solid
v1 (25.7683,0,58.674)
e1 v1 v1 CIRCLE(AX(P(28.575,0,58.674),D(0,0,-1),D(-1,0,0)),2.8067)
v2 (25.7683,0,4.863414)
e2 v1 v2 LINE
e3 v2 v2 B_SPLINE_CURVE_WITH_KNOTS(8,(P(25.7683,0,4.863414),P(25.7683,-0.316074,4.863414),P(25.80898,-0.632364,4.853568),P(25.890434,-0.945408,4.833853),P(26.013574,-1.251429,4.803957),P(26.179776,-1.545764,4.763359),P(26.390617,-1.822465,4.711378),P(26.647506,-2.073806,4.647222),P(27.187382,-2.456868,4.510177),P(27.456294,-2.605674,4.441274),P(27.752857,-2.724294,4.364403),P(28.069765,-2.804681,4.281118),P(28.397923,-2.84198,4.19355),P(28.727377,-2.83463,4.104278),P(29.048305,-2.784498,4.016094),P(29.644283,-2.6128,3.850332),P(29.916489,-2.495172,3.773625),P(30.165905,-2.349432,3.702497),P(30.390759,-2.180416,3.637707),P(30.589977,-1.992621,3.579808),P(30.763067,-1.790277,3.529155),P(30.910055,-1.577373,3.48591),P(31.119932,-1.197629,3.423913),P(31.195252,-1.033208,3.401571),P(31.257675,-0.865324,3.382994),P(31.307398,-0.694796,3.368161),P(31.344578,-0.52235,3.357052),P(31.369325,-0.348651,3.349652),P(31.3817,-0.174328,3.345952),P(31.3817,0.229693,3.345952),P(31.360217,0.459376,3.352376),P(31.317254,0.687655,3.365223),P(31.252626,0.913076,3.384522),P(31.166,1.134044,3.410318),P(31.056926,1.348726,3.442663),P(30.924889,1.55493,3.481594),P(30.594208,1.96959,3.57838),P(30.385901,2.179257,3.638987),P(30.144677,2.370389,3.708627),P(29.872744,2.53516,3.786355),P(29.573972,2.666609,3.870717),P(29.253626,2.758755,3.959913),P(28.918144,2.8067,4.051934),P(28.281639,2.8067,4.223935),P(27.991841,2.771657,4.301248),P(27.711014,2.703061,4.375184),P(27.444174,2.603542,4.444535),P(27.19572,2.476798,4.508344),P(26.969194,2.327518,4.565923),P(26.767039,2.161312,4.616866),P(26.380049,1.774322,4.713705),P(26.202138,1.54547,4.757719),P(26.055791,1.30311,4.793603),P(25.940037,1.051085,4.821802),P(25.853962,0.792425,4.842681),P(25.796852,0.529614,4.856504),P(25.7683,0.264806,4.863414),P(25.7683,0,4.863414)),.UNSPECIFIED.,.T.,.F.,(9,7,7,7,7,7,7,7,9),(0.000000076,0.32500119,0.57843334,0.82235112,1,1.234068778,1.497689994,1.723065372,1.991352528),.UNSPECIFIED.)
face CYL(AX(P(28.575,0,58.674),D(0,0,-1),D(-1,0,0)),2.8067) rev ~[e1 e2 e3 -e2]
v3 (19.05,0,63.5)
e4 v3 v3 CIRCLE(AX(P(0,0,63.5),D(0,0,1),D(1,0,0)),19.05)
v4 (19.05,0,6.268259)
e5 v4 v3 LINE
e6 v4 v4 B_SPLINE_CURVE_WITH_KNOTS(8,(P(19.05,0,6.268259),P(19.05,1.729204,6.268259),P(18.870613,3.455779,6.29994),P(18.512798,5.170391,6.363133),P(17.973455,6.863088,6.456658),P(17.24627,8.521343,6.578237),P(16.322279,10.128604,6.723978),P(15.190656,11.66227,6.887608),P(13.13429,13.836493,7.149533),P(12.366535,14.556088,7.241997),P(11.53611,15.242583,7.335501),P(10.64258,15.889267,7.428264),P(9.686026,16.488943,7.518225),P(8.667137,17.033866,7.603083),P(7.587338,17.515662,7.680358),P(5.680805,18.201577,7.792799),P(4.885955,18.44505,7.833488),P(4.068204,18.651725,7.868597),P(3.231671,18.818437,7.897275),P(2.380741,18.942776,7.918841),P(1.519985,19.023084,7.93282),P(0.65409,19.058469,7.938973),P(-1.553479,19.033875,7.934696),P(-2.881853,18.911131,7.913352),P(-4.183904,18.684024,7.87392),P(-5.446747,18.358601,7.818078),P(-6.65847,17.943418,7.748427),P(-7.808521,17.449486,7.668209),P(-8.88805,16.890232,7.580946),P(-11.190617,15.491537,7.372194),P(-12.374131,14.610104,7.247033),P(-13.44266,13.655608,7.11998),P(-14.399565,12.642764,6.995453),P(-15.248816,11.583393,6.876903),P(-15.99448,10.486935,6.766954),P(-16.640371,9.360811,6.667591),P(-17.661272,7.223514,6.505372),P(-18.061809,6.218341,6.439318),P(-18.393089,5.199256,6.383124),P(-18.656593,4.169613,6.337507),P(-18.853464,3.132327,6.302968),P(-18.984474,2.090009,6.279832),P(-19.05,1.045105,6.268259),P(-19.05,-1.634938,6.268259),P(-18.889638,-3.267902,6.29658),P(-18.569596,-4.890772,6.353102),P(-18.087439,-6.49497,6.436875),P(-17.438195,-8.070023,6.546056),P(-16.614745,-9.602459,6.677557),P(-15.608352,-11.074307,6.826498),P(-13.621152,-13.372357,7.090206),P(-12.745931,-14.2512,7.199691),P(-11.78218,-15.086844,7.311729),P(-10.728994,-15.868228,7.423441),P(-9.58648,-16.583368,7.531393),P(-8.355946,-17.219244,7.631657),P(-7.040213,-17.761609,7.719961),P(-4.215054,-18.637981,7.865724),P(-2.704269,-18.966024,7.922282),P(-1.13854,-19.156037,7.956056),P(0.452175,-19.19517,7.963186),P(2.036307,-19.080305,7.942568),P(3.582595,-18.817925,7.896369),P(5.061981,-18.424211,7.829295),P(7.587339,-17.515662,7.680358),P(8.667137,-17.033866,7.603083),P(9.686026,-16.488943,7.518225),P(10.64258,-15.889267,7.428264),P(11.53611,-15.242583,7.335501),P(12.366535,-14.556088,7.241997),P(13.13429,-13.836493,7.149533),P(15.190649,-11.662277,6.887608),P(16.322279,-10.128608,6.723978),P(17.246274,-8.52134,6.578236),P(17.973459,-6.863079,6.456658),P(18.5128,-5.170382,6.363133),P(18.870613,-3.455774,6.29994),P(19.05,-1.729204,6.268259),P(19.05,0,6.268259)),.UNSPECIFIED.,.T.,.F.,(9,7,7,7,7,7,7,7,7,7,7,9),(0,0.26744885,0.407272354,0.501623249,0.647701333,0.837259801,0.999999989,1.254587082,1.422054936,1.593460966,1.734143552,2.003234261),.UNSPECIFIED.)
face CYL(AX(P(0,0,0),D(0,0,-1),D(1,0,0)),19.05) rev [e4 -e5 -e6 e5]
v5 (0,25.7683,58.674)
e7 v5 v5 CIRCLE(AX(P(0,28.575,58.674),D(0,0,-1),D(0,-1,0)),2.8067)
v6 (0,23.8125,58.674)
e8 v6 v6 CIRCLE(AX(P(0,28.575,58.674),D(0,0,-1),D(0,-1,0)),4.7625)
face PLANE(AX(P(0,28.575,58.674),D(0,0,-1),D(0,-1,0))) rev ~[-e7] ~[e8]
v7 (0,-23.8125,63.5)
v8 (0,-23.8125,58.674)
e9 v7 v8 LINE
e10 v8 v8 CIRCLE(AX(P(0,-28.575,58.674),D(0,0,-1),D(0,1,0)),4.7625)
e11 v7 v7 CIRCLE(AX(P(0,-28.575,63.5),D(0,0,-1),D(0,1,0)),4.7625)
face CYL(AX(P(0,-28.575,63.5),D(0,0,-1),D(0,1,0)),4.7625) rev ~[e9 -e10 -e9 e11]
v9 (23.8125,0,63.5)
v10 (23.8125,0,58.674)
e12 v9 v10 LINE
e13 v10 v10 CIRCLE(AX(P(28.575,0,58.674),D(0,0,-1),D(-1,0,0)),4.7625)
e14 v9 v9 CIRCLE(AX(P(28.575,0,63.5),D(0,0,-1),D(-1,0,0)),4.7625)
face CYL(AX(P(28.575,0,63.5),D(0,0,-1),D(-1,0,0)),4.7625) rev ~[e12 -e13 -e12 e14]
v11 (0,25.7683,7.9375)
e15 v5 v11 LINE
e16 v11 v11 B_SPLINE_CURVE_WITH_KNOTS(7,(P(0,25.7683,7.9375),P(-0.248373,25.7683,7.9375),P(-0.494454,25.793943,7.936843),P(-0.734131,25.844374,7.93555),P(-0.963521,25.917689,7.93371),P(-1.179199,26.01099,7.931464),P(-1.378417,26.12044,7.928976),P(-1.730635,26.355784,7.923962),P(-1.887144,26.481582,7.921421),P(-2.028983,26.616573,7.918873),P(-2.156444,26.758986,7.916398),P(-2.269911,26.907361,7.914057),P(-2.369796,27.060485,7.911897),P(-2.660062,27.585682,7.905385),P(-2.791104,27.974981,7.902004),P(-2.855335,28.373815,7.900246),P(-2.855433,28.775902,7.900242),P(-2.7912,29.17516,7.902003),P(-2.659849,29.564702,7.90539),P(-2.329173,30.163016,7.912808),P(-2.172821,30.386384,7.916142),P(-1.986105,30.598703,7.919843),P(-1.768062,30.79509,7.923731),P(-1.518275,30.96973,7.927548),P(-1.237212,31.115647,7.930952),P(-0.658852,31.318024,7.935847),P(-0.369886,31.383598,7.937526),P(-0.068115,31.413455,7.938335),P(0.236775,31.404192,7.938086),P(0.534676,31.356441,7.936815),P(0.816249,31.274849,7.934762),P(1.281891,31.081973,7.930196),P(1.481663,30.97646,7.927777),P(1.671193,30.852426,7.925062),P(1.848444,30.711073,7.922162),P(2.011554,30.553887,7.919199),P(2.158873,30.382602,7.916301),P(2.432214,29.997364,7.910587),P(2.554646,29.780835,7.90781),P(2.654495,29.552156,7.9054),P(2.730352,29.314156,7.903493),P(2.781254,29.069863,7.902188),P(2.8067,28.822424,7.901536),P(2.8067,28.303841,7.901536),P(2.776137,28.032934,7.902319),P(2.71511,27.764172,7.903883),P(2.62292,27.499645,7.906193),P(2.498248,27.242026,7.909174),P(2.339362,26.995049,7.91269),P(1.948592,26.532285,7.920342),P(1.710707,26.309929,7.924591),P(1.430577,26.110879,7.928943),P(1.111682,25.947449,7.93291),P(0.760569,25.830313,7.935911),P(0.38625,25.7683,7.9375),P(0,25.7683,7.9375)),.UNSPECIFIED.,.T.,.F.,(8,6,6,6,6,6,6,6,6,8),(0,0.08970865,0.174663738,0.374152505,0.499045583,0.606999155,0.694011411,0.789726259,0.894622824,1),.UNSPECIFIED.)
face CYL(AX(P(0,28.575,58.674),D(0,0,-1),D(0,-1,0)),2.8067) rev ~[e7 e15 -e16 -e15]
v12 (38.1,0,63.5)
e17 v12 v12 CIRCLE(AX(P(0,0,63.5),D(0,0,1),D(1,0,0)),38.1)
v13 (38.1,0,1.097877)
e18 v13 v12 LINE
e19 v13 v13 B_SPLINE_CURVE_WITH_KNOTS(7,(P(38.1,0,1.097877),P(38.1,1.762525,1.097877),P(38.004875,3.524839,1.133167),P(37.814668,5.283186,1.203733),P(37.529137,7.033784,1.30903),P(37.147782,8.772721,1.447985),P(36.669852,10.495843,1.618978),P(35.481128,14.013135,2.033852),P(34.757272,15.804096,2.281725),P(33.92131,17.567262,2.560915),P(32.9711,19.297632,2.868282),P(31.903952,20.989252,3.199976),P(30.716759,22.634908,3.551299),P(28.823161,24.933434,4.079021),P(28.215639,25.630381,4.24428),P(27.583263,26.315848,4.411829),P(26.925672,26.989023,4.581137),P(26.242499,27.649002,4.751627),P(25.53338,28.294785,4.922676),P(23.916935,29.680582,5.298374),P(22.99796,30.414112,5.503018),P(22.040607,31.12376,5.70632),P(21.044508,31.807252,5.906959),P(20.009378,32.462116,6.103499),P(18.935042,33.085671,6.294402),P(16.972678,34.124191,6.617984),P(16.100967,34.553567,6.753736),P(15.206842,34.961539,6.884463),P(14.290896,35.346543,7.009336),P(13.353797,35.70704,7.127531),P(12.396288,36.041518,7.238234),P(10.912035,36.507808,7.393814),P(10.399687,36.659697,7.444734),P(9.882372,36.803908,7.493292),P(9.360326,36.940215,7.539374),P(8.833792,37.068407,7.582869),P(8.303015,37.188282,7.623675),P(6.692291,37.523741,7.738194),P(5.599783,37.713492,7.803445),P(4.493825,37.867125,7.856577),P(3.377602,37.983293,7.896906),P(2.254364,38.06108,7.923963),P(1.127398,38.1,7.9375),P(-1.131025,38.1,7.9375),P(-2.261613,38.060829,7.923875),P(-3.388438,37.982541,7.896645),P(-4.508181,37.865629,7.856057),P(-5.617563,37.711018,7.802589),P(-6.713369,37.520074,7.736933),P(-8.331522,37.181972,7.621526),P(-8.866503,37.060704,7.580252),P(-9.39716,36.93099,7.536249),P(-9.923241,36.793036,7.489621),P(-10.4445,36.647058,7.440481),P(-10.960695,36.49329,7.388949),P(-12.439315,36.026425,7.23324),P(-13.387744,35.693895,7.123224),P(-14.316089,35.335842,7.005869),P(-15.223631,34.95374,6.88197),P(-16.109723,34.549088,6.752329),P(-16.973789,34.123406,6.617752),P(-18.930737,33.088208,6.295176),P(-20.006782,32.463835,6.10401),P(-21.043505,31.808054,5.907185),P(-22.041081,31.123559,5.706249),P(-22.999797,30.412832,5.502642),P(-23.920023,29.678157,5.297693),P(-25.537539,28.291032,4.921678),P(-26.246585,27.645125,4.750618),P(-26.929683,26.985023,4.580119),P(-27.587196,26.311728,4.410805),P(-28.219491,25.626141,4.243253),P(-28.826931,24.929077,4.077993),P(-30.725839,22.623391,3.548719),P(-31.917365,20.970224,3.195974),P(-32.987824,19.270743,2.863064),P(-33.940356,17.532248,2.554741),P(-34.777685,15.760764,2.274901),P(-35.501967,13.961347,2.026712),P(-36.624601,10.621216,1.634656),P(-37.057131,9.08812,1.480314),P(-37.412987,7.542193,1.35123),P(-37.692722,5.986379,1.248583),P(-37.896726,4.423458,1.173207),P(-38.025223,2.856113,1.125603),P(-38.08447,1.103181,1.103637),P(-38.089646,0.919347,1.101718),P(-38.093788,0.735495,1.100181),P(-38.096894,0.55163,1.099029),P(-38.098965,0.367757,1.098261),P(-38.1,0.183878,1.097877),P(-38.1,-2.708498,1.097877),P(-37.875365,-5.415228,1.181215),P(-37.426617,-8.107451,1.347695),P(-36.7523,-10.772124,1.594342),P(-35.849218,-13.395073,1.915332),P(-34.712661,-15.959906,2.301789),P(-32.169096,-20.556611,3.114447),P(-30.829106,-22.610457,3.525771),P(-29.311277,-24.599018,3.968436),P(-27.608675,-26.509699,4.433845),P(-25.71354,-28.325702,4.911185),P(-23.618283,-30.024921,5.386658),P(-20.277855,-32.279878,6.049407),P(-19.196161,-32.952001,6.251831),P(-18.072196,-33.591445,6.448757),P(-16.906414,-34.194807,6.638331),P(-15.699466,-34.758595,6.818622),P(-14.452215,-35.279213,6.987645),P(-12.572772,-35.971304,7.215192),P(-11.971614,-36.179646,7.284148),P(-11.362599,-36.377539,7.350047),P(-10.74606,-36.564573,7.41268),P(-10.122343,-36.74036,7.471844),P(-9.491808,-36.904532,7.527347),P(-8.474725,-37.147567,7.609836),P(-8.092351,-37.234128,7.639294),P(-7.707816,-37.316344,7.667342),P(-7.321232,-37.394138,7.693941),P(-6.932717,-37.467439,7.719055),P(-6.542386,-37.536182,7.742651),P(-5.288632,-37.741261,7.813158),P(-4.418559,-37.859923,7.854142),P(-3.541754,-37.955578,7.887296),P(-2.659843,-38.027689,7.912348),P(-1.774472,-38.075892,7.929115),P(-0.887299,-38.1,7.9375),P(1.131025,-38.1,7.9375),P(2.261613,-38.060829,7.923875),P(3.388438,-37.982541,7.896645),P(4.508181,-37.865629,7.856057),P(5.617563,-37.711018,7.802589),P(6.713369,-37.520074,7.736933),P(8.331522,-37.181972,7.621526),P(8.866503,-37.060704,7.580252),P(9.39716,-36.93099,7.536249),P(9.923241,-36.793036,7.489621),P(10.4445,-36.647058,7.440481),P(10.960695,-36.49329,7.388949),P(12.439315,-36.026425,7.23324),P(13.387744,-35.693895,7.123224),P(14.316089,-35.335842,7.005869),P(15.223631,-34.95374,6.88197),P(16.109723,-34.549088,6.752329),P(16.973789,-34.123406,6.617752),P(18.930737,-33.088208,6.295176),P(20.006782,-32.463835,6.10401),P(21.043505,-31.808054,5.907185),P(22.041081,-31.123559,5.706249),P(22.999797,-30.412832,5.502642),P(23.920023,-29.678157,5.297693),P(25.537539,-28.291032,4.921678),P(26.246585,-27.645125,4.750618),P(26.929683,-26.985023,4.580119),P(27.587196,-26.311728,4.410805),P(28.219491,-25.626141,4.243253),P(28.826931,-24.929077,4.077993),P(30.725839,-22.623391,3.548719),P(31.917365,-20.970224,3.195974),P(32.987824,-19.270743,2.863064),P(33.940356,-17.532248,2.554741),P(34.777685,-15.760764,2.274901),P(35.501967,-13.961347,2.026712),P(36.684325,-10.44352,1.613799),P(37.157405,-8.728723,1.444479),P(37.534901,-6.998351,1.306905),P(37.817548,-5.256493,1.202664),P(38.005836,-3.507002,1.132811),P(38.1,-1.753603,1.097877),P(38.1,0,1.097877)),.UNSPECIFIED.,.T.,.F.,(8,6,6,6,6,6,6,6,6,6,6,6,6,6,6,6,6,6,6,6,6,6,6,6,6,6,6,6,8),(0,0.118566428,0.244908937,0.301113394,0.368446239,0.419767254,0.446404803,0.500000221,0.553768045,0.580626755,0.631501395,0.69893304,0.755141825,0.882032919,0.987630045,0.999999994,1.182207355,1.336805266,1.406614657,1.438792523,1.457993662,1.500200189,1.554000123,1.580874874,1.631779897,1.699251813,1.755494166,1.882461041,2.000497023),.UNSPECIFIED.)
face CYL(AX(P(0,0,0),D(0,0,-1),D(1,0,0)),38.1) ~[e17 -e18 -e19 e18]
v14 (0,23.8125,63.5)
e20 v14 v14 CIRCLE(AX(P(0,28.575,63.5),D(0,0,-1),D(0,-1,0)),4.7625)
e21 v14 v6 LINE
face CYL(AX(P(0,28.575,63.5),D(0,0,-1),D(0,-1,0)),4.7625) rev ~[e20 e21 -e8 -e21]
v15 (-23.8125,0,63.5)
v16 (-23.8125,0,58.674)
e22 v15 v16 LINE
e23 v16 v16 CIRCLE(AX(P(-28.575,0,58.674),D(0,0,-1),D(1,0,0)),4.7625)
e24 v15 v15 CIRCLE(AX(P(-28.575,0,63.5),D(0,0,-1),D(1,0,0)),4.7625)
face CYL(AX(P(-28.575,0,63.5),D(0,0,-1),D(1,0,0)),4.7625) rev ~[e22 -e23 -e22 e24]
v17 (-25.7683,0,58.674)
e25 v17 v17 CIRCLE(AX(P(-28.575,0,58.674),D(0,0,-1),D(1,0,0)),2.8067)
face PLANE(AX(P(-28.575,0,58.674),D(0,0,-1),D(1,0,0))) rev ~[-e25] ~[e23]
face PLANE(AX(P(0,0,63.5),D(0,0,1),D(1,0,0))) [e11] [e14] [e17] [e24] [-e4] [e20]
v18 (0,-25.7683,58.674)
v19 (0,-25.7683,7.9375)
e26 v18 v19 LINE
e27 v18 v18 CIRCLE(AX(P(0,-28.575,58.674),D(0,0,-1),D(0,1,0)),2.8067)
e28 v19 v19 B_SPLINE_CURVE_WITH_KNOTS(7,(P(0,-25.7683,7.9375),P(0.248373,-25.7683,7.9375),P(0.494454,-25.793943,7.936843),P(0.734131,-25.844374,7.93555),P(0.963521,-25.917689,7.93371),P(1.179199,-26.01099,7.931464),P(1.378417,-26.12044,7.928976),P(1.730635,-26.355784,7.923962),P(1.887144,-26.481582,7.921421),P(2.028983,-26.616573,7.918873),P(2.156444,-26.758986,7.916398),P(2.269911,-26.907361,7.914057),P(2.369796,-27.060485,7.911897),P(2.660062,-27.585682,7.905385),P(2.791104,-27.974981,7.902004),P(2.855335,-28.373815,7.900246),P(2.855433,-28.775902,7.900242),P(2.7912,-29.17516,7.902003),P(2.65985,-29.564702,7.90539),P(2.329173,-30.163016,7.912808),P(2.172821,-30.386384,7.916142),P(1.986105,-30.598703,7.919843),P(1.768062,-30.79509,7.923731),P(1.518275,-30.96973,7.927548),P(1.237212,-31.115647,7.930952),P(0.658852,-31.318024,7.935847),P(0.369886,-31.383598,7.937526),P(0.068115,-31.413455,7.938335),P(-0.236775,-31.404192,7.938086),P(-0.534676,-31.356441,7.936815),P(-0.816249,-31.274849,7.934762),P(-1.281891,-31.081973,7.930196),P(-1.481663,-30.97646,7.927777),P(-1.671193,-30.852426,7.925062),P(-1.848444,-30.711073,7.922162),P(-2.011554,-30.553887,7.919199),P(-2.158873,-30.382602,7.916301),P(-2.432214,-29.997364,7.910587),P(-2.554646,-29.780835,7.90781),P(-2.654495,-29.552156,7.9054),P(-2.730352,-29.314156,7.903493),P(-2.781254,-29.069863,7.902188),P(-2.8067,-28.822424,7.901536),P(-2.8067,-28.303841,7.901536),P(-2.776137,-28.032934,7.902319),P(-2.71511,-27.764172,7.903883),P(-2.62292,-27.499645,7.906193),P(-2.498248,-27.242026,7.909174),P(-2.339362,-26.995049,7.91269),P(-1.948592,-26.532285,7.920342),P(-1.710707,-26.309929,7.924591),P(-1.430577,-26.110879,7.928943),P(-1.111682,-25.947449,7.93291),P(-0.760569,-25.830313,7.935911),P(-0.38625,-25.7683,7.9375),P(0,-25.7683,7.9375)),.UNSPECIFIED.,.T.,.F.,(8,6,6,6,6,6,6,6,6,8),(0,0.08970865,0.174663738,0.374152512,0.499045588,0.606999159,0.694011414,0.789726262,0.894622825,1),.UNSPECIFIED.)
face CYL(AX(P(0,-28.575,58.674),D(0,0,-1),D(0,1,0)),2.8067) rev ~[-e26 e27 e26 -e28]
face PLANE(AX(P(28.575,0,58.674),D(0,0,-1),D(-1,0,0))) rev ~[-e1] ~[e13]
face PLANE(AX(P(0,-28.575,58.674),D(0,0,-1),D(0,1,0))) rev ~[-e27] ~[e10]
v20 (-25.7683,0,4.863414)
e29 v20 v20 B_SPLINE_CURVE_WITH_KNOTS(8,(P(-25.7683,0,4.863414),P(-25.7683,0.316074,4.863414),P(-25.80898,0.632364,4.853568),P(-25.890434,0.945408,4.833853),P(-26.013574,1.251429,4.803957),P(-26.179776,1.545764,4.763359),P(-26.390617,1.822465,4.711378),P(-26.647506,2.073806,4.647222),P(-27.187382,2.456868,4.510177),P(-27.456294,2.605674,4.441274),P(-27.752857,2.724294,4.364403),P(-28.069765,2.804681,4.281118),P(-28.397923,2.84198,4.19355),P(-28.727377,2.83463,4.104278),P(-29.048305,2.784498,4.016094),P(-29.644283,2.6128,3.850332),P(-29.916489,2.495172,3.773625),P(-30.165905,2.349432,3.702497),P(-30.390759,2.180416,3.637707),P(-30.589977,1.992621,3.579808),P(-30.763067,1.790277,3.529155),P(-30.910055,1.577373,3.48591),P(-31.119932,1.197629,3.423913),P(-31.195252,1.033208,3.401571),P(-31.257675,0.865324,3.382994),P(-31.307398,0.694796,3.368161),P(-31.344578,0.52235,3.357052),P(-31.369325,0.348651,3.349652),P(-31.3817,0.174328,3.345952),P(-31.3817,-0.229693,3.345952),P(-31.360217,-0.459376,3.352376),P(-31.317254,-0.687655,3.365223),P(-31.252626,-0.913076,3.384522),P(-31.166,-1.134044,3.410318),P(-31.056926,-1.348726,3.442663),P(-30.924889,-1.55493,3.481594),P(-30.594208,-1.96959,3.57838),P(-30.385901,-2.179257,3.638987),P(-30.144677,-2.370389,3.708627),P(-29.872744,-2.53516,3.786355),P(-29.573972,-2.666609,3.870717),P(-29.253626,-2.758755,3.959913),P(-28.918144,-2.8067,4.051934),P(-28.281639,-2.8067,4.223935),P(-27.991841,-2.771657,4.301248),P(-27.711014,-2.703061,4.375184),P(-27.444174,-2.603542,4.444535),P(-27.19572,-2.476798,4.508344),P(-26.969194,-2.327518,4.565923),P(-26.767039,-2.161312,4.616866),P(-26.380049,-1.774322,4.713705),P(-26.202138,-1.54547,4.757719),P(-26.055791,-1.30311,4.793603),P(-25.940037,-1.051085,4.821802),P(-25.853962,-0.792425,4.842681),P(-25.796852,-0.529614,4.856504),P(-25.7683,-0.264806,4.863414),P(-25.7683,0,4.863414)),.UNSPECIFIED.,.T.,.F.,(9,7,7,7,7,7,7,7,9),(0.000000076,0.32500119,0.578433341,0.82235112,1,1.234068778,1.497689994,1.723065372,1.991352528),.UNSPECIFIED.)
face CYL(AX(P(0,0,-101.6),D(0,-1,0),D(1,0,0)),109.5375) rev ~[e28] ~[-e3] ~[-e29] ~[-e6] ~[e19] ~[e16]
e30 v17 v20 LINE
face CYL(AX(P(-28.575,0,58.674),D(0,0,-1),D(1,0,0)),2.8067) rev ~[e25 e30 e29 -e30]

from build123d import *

# Parameters (mm, degrees)
F0_R            = 38.1
F0_R_2          = 19.05
F1_DEPTH        = 63.5
F3_COPIES_COUNT = 4
F4_R            = 109.5375
F5_DEPTH        = 38.101
F5_DEPTH_BACK   = 38.101


# Not quite as in the source:
# - a pattern or mirror of a feature is missing from the dataset's text; its kind, count and spacing are read off the source's solid


with BuildPart() as f1:
    # F0 (on Top) → F1 (new body)
    with BuildSketch(Plane.XY):
        Circle(F0_R)
        Circle(F0_R_2, mode=Mode.SUBTRACT)
    extrude(amount=F1_DEPTH)

    # F2 (on Front) → F3 (revolve, cut)
    with BuildSketch(Plane.XZ):
        Polygon((28.575, 0), (28.575, 63.5), (23.8125, 63.5), (23.8125, 58.674), (25.7683, 58.674), (25.7683, 0), align=None)
    f3 = revolve(axis=Axis((28.575, 0, 28.6447224574), (0, 0, -1)), mode=Mode.SUBTRACT)

    # F3_copies: F3 ×4 about axis
    f3_copies_axis = Axis((0, 0, 0), (0, 0, 1))
    for i in range(1, F3_COPIES_COUNT):
        add(f3.rotate(f3_copies_axis, i * 360 / F3_COPIES_COUNT), mode=Mode.SUBTRACT)

    # F4 (on Front) → F5 (cut, two sides)
    with BuildSketch(Plane.XZ) as f5_sk:
        with Locations((0, -101.6)):
            Circle(F4_R)
    extrude(amount=-F5_DEPTH, mode=Mode.SUBTRACT)
    extrude(f5_sk.sketch, amount=F5_DEPTH_BACK, mode=Mode.SUBTRACT)


solid = f1.part
